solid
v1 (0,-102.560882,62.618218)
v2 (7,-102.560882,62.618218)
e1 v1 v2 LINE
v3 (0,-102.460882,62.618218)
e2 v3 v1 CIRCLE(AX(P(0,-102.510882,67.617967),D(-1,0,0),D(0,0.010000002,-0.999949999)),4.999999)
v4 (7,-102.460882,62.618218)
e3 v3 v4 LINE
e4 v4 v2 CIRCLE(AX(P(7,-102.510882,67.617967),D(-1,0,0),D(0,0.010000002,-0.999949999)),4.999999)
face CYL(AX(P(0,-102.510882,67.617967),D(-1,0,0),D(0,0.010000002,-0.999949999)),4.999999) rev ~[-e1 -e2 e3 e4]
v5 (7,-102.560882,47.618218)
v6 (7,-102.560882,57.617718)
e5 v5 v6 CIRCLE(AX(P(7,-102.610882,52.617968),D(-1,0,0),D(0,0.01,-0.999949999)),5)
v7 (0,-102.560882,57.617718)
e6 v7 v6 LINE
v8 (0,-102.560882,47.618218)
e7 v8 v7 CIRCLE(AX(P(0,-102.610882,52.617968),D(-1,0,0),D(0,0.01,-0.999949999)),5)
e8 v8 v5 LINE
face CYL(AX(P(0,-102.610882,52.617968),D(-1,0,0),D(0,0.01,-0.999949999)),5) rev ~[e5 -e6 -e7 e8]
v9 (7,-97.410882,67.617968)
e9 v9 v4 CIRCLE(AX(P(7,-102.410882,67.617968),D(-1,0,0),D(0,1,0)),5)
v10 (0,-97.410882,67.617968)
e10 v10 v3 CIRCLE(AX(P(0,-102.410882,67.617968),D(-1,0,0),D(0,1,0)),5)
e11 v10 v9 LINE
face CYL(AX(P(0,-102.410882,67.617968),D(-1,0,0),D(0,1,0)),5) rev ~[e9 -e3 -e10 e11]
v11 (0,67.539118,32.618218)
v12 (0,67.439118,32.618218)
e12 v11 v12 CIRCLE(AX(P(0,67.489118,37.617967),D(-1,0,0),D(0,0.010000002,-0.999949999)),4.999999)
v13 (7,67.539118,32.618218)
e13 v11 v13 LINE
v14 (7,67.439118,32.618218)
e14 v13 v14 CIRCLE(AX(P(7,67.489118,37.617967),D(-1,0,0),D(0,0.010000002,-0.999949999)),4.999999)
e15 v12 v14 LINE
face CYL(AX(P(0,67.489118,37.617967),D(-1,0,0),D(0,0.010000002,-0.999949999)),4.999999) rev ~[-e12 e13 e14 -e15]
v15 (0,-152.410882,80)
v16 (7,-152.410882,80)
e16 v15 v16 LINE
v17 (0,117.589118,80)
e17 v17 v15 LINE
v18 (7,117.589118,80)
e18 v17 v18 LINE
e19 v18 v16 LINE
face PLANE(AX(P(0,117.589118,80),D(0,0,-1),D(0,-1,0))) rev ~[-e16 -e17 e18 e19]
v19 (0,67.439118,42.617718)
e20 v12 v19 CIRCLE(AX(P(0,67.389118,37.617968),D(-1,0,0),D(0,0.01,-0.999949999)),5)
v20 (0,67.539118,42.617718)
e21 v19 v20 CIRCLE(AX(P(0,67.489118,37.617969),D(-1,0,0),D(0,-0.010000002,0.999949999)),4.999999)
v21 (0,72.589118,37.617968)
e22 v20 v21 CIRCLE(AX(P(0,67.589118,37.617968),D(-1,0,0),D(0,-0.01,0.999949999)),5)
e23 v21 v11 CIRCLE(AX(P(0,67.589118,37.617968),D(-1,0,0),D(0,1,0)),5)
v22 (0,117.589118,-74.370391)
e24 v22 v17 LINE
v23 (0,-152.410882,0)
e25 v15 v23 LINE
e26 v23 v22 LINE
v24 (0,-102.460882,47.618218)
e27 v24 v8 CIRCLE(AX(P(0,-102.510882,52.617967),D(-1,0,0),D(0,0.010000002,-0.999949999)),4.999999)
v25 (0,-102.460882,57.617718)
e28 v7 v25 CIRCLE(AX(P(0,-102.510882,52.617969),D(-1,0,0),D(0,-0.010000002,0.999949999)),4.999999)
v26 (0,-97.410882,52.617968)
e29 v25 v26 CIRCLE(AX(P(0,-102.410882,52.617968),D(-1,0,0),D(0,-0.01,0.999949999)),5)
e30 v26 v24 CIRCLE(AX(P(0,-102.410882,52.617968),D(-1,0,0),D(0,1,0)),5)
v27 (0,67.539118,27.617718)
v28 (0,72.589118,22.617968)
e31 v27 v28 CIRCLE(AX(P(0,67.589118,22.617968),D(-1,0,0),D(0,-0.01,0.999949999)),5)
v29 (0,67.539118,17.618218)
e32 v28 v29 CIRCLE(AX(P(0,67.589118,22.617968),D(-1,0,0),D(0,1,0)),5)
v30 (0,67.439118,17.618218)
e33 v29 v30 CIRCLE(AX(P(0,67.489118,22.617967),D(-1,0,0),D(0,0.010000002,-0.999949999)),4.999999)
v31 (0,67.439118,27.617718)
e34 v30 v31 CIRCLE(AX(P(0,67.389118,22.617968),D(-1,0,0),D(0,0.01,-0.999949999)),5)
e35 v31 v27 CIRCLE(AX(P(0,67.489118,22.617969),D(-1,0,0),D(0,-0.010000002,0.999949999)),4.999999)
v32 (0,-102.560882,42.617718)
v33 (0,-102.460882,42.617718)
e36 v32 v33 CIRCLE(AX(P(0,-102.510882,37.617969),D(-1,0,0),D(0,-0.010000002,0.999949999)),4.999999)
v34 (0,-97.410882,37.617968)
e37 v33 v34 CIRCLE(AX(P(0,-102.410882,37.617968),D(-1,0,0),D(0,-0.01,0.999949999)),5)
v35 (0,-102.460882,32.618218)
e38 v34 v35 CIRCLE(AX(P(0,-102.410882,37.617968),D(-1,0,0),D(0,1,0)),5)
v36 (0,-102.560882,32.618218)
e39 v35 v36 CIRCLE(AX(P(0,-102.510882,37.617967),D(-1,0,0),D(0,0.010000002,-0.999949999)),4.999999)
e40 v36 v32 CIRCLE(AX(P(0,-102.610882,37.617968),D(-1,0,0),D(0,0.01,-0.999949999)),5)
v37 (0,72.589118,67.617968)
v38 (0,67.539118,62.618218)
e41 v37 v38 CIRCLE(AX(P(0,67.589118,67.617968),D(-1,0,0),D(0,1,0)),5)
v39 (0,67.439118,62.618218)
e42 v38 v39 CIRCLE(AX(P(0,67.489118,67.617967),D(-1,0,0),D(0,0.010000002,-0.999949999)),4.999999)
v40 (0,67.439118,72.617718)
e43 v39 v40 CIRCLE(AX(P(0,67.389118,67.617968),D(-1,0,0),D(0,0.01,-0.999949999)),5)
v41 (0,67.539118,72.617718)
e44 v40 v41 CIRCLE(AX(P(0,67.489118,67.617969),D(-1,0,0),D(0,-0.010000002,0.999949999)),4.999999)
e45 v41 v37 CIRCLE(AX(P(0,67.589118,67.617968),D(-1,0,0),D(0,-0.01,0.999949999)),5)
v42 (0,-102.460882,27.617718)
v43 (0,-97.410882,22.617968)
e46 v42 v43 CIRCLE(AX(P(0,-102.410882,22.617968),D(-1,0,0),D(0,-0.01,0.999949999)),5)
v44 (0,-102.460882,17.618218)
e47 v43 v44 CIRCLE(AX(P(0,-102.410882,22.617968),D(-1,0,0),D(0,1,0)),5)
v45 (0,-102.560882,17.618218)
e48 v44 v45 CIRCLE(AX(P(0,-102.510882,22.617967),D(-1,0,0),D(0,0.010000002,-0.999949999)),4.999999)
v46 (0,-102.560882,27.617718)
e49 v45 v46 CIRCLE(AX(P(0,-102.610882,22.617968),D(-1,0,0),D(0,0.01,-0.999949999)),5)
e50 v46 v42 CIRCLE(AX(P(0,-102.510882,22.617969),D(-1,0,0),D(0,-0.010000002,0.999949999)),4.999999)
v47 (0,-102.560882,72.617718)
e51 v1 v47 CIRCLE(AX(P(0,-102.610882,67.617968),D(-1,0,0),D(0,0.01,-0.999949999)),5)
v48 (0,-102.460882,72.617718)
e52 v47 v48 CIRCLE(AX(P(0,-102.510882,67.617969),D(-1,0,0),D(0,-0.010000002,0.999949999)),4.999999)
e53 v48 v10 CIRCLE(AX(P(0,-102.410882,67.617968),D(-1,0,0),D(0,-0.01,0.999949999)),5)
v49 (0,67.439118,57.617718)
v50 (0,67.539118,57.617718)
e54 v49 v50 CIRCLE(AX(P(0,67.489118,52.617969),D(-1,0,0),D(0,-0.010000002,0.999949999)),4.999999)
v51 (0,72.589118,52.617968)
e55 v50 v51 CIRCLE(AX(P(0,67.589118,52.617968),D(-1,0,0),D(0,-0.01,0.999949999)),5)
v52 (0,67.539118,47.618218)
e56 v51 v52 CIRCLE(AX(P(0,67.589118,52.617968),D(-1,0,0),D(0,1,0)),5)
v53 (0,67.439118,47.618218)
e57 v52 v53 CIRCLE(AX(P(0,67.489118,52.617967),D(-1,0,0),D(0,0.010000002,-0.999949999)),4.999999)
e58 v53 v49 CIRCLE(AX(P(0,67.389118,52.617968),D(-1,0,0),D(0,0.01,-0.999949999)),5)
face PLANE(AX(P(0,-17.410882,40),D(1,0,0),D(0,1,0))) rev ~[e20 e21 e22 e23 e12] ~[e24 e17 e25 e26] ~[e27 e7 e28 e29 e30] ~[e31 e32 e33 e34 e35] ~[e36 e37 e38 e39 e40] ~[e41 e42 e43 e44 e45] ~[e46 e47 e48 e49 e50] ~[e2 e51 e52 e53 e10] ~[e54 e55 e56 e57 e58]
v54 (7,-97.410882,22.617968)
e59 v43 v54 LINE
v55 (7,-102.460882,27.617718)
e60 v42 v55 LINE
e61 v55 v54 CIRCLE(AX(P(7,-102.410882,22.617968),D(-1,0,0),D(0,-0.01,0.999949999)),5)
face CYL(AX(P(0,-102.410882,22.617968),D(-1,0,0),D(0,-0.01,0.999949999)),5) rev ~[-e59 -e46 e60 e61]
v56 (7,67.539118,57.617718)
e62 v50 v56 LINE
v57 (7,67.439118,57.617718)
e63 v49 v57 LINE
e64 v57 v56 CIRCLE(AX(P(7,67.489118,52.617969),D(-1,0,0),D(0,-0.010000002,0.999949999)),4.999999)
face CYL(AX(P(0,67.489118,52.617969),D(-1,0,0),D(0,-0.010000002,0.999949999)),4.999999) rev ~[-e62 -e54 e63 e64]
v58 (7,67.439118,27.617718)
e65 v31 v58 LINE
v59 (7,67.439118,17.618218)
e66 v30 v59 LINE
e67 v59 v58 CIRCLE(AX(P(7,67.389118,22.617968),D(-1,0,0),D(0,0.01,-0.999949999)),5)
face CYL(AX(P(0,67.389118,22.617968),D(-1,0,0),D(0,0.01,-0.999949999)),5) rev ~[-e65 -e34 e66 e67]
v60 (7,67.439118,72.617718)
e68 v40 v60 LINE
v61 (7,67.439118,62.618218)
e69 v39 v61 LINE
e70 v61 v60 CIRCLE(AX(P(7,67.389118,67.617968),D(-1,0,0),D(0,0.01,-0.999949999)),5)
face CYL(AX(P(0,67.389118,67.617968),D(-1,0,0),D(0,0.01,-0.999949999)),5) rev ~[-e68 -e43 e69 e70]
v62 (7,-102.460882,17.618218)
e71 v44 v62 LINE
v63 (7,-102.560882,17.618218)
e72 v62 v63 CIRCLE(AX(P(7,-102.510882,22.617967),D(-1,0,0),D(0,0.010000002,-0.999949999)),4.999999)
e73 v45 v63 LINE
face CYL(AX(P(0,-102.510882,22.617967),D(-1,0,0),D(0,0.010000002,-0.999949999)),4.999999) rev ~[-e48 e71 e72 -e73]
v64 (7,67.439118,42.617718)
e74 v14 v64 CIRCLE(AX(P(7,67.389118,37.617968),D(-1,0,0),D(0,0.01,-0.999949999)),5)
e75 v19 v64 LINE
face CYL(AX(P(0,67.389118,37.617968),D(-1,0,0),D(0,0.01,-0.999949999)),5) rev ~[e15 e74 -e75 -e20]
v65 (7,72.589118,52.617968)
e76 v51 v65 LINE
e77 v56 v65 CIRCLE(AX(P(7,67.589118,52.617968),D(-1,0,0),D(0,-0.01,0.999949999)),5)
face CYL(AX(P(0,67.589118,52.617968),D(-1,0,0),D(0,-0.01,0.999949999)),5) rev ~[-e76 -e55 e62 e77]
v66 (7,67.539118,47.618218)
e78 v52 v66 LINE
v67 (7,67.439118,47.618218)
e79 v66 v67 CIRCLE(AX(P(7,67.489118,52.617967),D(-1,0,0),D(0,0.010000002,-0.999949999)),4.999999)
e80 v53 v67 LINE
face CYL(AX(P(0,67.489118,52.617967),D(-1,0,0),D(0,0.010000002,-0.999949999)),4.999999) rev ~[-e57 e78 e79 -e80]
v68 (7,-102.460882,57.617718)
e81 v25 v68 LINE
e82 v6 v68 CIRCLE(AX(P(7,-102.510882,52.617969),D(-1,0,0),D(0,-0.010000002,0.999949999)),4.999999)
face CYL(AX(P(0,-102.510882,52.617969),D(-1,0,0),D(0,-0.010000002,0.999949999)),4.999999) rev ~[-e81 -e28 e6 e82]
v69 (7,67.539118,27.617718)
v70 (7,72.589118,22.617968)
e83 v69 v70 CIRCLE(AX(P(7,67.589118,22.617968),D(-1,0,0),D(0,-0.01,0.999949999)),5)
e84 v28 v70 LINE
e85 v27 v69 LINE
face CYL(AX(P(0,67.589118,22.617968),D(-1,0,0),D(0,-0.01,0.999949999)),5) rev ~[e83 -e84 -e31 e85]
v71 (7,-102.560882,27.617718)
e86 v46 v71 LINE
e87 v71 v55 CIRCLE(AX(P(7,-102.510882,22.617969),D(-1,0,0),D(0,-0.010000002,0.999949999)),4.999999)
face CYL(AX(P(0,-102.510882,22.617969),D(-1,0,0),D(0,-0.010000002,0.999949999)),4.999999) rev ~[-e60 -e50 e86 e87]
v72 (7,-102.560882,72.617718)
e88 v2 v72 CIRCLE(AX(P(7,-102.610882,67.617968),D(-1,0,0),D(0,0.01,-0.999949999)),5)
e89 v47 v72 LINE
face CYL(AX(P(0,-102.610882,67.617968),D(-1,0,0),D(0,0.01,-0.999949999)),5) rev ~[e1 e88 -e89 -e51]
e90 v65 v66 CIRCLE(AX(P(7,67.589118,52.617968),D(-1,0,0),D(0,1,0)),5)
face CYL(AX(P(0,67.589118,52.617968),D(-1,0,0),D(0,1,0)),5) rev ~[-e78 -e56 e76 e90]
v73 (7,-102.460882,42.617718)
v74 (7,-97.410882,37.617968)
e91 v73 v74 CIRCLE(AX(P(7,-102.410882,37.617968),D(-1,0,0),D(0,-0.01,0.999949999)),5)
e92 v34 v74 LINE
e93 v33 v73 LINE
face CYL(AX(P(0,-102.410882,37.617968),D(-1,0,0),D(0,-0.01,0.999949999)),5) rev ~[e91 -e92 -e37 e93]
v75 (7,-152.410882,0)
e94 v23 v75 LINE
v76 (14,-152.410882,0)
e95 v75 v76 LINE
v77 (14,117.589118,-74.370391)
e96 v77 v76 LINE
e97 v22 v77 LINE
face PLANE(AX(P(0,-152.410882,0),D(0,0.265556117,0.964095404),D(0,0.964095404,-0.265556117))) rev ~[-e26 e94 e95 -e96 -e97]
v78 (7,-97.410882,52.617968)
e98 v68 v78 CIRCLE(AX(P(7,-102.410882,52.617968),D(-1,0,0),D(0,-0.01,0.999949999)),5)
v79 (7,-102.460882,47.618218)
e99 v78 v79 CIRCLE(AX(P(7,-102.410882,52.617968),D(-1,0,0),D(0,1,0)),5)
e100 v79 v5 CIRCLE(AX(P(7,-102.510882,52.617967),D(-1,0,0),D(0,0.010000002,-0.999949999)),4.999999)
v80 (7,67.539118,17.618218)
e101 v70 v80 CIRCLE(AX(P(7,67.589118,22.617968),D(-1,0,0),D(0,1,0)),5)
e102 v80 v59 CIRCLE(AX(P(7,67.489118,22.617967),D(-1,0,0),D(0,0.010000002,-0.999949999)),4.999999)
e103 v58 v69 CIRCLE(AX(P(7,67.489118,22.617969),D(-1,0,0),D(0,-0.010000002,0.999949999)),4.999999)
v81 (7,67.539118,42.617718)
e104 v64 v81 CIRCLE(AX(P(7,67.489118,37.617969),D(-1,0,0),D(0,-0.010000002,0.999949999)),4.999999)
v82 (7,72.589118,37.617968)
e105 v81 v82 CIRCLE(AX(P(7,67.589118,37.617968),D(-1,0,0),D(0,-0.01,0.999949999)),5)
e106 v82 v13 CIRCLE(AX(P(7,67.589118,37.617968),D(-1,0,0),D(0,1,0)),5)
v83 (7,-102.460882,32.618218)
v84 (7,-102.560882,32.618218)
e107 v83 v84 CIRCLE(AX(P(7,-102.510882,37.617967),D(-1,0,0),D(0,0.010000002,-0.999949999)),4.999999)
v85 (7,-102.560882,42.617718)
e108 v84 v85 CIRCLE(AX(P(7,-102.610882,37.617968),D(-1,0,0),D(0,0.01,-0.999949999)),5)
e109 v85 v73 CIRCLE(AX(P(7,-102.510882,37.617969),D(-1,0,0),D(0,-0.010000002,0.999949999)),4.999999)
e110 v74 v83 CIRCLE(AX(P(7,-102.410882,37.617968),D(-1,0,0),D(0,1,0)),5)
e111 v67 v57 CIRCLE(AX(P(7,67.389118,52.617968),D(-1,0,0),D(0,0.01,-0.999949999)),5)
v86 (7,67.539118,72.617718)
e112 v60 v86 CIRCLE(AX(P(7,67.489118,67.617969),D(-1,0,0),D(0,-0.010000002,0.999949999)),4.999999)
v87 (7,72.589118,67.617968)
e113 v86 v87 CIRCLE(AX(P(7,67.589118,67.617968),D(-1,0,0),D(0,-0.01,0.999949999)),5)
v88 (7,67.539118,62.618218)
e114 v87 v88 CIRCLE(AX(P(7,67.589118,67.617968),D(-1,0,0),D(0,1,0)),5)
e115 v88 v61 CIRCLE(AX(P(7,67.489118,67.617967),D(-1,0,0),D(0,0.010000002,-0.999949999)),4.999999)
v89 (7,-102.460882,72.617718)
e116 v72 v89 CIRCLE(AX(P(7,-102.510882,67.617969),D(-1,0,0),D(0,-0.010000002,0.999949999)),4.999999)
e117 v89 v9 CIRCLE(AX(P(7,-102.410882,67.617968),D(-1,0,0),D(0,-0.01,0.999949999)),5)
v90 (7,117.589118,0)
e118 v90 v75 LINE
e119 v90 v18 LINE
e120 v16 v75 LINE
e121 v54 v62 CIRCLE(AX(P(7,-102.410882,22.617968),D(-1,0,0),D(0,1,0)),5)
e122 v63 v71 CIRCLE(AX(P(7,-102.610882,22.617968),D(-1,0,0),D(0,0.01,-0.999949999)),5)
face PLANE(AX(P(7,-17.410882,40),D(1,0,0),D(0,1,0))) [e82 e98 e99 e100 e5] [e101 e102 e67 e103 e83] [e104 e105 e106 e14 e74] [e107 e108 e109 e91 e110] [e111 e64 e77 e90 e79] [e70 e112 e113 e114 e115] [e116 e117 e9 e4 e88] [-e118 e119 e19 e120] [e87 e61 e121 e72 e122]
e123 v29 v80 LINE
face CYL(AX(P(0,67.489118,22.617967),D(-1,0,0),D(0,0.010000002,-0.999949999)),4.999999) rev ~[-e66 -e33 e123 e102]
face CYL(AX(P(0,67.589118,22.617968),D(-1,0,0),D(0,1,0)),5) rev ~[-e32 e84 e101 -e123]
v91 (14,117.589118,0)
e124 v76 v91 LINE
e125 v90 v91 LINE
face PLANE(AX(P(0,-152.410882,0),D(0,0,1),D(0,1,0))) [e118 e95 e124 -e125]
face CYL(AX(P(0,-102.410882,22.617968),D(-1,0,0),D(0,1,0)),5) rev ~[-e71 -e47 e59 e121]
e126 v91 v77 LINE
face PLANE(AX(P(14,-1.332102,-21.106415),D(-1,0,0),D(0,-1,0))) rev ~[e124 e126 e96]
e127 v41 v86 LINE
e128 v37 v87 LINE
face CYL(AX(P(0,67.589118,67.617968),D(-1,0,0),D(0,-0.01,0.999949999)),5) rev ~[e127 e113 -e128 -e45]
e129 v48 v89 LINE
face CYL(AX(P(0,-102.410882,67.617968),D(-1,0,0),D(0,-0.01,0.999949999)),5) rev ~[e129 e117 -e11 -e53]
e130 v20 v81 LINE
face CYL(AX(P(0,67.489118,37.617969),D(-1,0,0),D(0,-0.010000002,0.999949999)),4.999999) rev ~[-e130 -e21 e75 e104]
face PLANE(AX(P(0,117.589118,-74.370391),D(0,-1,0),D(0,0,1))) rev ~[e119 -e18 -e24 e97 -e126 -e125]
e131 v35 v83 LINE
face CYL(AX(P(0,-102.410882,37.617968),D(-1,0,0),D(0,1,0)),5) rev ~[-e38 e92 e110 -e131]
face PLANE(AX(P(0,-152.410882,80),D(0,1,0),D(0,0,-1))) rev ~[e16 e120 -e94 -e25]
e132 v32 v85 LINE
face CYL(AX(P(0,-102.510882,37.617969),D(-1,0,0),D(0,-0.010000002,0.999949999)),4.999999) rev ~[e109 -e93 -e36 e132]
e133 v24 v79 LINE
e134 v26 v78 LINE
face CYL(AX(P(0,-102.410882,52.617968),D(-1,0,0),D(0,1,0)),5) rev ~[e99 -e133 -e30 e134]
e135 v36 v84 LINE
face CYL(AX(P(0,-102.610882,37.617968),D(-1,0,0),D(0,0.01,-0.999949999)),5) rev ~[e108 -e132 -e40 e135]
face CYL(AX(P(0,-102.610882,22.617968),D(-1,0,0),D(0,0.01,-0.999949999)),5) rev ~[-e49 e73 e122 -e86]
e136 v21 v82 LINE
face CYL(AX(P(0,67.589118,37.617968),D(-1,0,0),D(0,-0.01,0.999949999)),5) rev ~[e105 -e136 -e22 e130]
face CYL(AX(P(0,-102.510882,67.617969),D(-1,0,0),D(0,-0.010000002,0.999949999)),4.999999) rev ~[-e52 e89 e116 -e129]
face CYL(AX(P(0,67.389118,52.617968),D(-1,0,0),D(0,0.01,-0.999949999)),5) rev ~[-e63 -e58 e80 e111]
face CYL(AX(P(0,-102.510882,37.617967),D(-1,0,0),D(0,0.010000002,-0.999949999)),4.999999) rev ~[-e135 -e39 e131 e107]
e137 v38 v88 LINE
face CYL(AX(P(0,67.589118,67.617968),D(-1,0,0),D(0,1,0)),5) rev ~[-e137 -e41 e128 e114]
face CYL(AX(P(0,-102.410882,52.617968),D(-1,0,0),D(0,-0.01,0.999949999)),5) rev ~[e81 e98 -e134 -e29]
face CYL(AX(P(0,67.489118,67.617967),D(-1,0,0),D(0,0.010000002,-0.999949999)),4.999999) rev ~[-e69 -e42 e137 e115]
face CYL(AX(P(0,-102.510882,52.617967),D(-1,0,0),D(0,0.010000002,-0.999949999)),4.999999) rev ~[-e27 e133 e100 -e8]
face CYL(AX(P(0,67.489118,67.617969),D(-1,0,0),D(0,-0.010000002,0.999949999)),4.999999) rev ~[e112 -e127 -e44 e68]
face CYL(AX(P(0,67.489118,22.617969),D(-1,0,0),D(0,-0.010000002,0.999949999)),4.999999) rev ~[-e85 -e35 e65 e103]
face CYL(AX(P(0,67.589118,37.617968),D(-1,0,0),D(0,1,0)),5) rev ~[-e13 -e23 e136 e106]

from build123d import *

# Parameters (mm, degrees)
F1_DEPTH = 7
F3_DEPTH = 14


# Not quite as in the source:
# - a feature names something its author has since deleted; it is built from what else it names


with BuildPart() as f1:
    # F0 (on Right) → F1 (new body)
    with BuildSketch(Plane.YZ):
        Polygon((-102.4108821703, 80), (-152.4108821703, 80), (-152.4108821703, 0), (117.5891178297, 0), (117.5891178297, 80), (67.5891178297, 80), align=None)
        with BuildLine():
            ThreePointArc((-102.4608821703, 27.6177177185), (-98.8930703505, 26.1711353257), (-97.4108821703, 22.6179677248))
            ThreePointArc((-97.4108821703, 22.6179677248), (-98.8930703505, 19.0648001239), (-102.4608821703, 17.6182177311))
            ThreePointArc((-102.4608821703, 17.6182177311), (-102.5108821703, 17.6179677248), (-102.5608821703, 17.6182177311))
            ThreePointArc((-102.5608821703, 17.6182177311), (-107.6108821703, 22.6179677248), (-102.5608821703, 27.6177177185))
            ThreePointArc((-102.5608821703, 27.6177177185), (-102.5108821703, 27.6179677248), (-102.4608821703, 27.6177177185))
        make_face(mode=Mode.SUBTRACT)
        with BuildLine():
            ThreePointArc((-102.4608821703, 42.6177177185), (-98.8930703505, 41.1711353257), (-97.4108821703, 37.6179677248))
            ThreePointArc((-97.4108821703, 37.6179677248), (-98.8930703505, 34.0648001239), (-102.4608821703, 32.6182177311))
            ThreePointArc((-102.4608821703, 32.6182177311), (-102.5108821703, 32.6179677248), (-102.5608821703, 32.6182177311))
            ThreePointArc((-102.5608821703, 32.6182177311), (-107.6108821703, 37.6179677248), (-102.5608821703, 42.6177177185))
            ThreePointArc((-102.5608821703, 42.6177177185), (-102.5108821703, 42.6179677248), (-102.4608821703, 42.6177177185))
        make_face(mode=Mode.SUBTRACT)
        with BuildLine():
            ThreePointArc((-102.4608821703, 57.6177177185), (-98.8930703505, 56.1711353257), (-97.4108821703, 52.6179677248))
            ThreePointArc((-97.4108821703, 52.6179677248), (-98.8930703505, 49.0648001239), (-102.4608821703, 47.6182177311))
            ThreePointArc((-102.4608821703, 47.6182177311), (-102.5108821703, 47.6179677248), (-102.5608821703, 47.6182177311))
            ThreePointArc((-102.5608821703, 47.6182177311), (-107.6108821703, 52.6179677248), (-102.5608821703, 57.6177177185))
            ThreePointArc((-102.5608821703, 57.6177177185), (-102.5108821703, 57.6179677248), (-102.4608821703, 57.6177177185))
        make_face(mode=Mode.SUBTRACT)
        with BuildLine():
            ThreePointArc((-102.4608821703, 72.6177177185), (-98.8930703505, 71.1711353257), (-97.4108821703, 67.6179677248))
            ThreePointArc((-97.4108821703, 67.6179677248), (-98.8930703505, 64.0648001239), (-102.4608821703, 62.6182177311))
            ThreePointArc((-102.4608821703, 62.6182177311), (-102.5108821703, 62.6179677248), (-102.5608821703, 62.6182177311))
            ThreePointArc((-102.5608821703, 62.6182177311), (-107.6108821703, 67.6179677248), (-102.5608821703, 72.6177177185))
            ThreePointArc((-102.5608821703, 72.6177177185), (-102.5108821703, 72.6179677248), (-102.4608821703, 72.6177177185))
        make_face(mode=Mode.SUBTRACT)
        with BuildLine():
            ThreePointArc((67.5391178297, 27.6177177185), (71.1069296495, 26.1711353257), (72.5891178297, 22.6179677248))
            ThreePointArc((72.5891178297, 22.6179677248), (71.1069296495, 19.0648001239), (67.5391178297, 17.6182177311))
            ThreePointArc((67.5391178297, 17.6182177311), (67.4891178297, 17.6179677248), (67.4391178297, 17.6182177311))
            ThreePointArc((67.4391178297, 17.6182177311), (62.3891178297, 22.6179677248), (67.4391178297, 27.6177177185))
            ThreePointArc((67.4391178297, 27.6177177185), (67.4891178297, 27.6179677248), (67.5391178297, 27.6177177185))
        make_face(mode=Mode.SUBTRACT)
        with BuildLine():
            ThreePointArc((67.5391178297, 42.6177177185), (71.1069296495, 41.1711353257), (72.5891178297, 37.6179677248))
            ThreePointArc((72.5891178297, 37.6179677248), (71.1069296495, 34.0648001239), (67.5391178297, 32.6182177311))
            ThreePointArc((67.5391178297, 32.6182177311), (67.4891178297, 32.6179677248), (67.4391178297, 32.6182177311))
            ThreePointArc((67.4391178297, 32.6182177311), (62.3891178297, 37.6179677248), (67.4391178297, 42.6177177185))
            ThreePointArc((67.4391178297, 42.6177177185), (67.4891178297, 42.6179677248), (67.5391178297, 42.6177177185))
        make_face(mode=Mode.SUBTRACT)
        with BuildLine():
            ThreePointArc((67.5391178297, 57.6177177185), (71.1069296495, 56.1711353257), (72.5891178297, 52.6179677248))
            ThreePointArc((72.5891178297, 52.6179677248), (71.1069296495, 49.0648001239), (67.5391178297, 47.6182177311))
            ThreePointArc((67.5391178297, 47.6182177311), (67.4891178297, 47.6179677248), (67.4391178297, 47.6182177311))
            ThreePointArc((67.4391178297, 47.6182177311), (62.3891178297, 52.6179677248), (67.4391178297, 57.6177177185))
            ThreePointArc((67.4391178297, 57.6177177185), (67.4891178297, 57.6179677248), (67.5391178297, 57.6177177185))
        make_face(mode=Mode.SUBTRACT)
        with BuildLine():
            ThreePointArc((67.5391178297, 72.6177177185), (71.1069296495, 71.1711353257), (72.5891178297, 67.6179677248))
            ThreePointArc((72.5891178297, 67.6179677248), (71.1069296495, 64.0648001239), (67.5391178297, 62.6182177311))
            ThreePointArc((67.5391178297, 62.6182177311), (67.4891178297, 62.6179677248), (67.4391178297, 62.6182177311))
            ThreePointArc((67.4391178297, 62.6182177311), (62.3891178297, 67.6179677248), (67.4391178297, 72.6177177185))
            ThreePointArc((67.4391178297, 72.6177177185), (67.4891178297, 72.6179677248), (67.5391178297, 72.6177177185))
        make_face(mode=Mode.SUBTRACT)
        Polygon((117.5891178297, 0), (-152.4108821703, 0), (117.5891178297, -74.3703905304), align=None)
    extrude(amount=F1_DEPTH)

    # F2 (on face) → F3 (join)
    with BuildSketch(Plane(origin=(0, 0, 0), x_dir=(0, -1, 0), z_dir=(-1, 0, 0))):
        Polygon((-117.5891178297, -74.3703905304), (152.4108821703, 0), (-117.5891178297, 0), align=None)
    extrude(amount=-F3_DEPTH)


solid = f1.part
